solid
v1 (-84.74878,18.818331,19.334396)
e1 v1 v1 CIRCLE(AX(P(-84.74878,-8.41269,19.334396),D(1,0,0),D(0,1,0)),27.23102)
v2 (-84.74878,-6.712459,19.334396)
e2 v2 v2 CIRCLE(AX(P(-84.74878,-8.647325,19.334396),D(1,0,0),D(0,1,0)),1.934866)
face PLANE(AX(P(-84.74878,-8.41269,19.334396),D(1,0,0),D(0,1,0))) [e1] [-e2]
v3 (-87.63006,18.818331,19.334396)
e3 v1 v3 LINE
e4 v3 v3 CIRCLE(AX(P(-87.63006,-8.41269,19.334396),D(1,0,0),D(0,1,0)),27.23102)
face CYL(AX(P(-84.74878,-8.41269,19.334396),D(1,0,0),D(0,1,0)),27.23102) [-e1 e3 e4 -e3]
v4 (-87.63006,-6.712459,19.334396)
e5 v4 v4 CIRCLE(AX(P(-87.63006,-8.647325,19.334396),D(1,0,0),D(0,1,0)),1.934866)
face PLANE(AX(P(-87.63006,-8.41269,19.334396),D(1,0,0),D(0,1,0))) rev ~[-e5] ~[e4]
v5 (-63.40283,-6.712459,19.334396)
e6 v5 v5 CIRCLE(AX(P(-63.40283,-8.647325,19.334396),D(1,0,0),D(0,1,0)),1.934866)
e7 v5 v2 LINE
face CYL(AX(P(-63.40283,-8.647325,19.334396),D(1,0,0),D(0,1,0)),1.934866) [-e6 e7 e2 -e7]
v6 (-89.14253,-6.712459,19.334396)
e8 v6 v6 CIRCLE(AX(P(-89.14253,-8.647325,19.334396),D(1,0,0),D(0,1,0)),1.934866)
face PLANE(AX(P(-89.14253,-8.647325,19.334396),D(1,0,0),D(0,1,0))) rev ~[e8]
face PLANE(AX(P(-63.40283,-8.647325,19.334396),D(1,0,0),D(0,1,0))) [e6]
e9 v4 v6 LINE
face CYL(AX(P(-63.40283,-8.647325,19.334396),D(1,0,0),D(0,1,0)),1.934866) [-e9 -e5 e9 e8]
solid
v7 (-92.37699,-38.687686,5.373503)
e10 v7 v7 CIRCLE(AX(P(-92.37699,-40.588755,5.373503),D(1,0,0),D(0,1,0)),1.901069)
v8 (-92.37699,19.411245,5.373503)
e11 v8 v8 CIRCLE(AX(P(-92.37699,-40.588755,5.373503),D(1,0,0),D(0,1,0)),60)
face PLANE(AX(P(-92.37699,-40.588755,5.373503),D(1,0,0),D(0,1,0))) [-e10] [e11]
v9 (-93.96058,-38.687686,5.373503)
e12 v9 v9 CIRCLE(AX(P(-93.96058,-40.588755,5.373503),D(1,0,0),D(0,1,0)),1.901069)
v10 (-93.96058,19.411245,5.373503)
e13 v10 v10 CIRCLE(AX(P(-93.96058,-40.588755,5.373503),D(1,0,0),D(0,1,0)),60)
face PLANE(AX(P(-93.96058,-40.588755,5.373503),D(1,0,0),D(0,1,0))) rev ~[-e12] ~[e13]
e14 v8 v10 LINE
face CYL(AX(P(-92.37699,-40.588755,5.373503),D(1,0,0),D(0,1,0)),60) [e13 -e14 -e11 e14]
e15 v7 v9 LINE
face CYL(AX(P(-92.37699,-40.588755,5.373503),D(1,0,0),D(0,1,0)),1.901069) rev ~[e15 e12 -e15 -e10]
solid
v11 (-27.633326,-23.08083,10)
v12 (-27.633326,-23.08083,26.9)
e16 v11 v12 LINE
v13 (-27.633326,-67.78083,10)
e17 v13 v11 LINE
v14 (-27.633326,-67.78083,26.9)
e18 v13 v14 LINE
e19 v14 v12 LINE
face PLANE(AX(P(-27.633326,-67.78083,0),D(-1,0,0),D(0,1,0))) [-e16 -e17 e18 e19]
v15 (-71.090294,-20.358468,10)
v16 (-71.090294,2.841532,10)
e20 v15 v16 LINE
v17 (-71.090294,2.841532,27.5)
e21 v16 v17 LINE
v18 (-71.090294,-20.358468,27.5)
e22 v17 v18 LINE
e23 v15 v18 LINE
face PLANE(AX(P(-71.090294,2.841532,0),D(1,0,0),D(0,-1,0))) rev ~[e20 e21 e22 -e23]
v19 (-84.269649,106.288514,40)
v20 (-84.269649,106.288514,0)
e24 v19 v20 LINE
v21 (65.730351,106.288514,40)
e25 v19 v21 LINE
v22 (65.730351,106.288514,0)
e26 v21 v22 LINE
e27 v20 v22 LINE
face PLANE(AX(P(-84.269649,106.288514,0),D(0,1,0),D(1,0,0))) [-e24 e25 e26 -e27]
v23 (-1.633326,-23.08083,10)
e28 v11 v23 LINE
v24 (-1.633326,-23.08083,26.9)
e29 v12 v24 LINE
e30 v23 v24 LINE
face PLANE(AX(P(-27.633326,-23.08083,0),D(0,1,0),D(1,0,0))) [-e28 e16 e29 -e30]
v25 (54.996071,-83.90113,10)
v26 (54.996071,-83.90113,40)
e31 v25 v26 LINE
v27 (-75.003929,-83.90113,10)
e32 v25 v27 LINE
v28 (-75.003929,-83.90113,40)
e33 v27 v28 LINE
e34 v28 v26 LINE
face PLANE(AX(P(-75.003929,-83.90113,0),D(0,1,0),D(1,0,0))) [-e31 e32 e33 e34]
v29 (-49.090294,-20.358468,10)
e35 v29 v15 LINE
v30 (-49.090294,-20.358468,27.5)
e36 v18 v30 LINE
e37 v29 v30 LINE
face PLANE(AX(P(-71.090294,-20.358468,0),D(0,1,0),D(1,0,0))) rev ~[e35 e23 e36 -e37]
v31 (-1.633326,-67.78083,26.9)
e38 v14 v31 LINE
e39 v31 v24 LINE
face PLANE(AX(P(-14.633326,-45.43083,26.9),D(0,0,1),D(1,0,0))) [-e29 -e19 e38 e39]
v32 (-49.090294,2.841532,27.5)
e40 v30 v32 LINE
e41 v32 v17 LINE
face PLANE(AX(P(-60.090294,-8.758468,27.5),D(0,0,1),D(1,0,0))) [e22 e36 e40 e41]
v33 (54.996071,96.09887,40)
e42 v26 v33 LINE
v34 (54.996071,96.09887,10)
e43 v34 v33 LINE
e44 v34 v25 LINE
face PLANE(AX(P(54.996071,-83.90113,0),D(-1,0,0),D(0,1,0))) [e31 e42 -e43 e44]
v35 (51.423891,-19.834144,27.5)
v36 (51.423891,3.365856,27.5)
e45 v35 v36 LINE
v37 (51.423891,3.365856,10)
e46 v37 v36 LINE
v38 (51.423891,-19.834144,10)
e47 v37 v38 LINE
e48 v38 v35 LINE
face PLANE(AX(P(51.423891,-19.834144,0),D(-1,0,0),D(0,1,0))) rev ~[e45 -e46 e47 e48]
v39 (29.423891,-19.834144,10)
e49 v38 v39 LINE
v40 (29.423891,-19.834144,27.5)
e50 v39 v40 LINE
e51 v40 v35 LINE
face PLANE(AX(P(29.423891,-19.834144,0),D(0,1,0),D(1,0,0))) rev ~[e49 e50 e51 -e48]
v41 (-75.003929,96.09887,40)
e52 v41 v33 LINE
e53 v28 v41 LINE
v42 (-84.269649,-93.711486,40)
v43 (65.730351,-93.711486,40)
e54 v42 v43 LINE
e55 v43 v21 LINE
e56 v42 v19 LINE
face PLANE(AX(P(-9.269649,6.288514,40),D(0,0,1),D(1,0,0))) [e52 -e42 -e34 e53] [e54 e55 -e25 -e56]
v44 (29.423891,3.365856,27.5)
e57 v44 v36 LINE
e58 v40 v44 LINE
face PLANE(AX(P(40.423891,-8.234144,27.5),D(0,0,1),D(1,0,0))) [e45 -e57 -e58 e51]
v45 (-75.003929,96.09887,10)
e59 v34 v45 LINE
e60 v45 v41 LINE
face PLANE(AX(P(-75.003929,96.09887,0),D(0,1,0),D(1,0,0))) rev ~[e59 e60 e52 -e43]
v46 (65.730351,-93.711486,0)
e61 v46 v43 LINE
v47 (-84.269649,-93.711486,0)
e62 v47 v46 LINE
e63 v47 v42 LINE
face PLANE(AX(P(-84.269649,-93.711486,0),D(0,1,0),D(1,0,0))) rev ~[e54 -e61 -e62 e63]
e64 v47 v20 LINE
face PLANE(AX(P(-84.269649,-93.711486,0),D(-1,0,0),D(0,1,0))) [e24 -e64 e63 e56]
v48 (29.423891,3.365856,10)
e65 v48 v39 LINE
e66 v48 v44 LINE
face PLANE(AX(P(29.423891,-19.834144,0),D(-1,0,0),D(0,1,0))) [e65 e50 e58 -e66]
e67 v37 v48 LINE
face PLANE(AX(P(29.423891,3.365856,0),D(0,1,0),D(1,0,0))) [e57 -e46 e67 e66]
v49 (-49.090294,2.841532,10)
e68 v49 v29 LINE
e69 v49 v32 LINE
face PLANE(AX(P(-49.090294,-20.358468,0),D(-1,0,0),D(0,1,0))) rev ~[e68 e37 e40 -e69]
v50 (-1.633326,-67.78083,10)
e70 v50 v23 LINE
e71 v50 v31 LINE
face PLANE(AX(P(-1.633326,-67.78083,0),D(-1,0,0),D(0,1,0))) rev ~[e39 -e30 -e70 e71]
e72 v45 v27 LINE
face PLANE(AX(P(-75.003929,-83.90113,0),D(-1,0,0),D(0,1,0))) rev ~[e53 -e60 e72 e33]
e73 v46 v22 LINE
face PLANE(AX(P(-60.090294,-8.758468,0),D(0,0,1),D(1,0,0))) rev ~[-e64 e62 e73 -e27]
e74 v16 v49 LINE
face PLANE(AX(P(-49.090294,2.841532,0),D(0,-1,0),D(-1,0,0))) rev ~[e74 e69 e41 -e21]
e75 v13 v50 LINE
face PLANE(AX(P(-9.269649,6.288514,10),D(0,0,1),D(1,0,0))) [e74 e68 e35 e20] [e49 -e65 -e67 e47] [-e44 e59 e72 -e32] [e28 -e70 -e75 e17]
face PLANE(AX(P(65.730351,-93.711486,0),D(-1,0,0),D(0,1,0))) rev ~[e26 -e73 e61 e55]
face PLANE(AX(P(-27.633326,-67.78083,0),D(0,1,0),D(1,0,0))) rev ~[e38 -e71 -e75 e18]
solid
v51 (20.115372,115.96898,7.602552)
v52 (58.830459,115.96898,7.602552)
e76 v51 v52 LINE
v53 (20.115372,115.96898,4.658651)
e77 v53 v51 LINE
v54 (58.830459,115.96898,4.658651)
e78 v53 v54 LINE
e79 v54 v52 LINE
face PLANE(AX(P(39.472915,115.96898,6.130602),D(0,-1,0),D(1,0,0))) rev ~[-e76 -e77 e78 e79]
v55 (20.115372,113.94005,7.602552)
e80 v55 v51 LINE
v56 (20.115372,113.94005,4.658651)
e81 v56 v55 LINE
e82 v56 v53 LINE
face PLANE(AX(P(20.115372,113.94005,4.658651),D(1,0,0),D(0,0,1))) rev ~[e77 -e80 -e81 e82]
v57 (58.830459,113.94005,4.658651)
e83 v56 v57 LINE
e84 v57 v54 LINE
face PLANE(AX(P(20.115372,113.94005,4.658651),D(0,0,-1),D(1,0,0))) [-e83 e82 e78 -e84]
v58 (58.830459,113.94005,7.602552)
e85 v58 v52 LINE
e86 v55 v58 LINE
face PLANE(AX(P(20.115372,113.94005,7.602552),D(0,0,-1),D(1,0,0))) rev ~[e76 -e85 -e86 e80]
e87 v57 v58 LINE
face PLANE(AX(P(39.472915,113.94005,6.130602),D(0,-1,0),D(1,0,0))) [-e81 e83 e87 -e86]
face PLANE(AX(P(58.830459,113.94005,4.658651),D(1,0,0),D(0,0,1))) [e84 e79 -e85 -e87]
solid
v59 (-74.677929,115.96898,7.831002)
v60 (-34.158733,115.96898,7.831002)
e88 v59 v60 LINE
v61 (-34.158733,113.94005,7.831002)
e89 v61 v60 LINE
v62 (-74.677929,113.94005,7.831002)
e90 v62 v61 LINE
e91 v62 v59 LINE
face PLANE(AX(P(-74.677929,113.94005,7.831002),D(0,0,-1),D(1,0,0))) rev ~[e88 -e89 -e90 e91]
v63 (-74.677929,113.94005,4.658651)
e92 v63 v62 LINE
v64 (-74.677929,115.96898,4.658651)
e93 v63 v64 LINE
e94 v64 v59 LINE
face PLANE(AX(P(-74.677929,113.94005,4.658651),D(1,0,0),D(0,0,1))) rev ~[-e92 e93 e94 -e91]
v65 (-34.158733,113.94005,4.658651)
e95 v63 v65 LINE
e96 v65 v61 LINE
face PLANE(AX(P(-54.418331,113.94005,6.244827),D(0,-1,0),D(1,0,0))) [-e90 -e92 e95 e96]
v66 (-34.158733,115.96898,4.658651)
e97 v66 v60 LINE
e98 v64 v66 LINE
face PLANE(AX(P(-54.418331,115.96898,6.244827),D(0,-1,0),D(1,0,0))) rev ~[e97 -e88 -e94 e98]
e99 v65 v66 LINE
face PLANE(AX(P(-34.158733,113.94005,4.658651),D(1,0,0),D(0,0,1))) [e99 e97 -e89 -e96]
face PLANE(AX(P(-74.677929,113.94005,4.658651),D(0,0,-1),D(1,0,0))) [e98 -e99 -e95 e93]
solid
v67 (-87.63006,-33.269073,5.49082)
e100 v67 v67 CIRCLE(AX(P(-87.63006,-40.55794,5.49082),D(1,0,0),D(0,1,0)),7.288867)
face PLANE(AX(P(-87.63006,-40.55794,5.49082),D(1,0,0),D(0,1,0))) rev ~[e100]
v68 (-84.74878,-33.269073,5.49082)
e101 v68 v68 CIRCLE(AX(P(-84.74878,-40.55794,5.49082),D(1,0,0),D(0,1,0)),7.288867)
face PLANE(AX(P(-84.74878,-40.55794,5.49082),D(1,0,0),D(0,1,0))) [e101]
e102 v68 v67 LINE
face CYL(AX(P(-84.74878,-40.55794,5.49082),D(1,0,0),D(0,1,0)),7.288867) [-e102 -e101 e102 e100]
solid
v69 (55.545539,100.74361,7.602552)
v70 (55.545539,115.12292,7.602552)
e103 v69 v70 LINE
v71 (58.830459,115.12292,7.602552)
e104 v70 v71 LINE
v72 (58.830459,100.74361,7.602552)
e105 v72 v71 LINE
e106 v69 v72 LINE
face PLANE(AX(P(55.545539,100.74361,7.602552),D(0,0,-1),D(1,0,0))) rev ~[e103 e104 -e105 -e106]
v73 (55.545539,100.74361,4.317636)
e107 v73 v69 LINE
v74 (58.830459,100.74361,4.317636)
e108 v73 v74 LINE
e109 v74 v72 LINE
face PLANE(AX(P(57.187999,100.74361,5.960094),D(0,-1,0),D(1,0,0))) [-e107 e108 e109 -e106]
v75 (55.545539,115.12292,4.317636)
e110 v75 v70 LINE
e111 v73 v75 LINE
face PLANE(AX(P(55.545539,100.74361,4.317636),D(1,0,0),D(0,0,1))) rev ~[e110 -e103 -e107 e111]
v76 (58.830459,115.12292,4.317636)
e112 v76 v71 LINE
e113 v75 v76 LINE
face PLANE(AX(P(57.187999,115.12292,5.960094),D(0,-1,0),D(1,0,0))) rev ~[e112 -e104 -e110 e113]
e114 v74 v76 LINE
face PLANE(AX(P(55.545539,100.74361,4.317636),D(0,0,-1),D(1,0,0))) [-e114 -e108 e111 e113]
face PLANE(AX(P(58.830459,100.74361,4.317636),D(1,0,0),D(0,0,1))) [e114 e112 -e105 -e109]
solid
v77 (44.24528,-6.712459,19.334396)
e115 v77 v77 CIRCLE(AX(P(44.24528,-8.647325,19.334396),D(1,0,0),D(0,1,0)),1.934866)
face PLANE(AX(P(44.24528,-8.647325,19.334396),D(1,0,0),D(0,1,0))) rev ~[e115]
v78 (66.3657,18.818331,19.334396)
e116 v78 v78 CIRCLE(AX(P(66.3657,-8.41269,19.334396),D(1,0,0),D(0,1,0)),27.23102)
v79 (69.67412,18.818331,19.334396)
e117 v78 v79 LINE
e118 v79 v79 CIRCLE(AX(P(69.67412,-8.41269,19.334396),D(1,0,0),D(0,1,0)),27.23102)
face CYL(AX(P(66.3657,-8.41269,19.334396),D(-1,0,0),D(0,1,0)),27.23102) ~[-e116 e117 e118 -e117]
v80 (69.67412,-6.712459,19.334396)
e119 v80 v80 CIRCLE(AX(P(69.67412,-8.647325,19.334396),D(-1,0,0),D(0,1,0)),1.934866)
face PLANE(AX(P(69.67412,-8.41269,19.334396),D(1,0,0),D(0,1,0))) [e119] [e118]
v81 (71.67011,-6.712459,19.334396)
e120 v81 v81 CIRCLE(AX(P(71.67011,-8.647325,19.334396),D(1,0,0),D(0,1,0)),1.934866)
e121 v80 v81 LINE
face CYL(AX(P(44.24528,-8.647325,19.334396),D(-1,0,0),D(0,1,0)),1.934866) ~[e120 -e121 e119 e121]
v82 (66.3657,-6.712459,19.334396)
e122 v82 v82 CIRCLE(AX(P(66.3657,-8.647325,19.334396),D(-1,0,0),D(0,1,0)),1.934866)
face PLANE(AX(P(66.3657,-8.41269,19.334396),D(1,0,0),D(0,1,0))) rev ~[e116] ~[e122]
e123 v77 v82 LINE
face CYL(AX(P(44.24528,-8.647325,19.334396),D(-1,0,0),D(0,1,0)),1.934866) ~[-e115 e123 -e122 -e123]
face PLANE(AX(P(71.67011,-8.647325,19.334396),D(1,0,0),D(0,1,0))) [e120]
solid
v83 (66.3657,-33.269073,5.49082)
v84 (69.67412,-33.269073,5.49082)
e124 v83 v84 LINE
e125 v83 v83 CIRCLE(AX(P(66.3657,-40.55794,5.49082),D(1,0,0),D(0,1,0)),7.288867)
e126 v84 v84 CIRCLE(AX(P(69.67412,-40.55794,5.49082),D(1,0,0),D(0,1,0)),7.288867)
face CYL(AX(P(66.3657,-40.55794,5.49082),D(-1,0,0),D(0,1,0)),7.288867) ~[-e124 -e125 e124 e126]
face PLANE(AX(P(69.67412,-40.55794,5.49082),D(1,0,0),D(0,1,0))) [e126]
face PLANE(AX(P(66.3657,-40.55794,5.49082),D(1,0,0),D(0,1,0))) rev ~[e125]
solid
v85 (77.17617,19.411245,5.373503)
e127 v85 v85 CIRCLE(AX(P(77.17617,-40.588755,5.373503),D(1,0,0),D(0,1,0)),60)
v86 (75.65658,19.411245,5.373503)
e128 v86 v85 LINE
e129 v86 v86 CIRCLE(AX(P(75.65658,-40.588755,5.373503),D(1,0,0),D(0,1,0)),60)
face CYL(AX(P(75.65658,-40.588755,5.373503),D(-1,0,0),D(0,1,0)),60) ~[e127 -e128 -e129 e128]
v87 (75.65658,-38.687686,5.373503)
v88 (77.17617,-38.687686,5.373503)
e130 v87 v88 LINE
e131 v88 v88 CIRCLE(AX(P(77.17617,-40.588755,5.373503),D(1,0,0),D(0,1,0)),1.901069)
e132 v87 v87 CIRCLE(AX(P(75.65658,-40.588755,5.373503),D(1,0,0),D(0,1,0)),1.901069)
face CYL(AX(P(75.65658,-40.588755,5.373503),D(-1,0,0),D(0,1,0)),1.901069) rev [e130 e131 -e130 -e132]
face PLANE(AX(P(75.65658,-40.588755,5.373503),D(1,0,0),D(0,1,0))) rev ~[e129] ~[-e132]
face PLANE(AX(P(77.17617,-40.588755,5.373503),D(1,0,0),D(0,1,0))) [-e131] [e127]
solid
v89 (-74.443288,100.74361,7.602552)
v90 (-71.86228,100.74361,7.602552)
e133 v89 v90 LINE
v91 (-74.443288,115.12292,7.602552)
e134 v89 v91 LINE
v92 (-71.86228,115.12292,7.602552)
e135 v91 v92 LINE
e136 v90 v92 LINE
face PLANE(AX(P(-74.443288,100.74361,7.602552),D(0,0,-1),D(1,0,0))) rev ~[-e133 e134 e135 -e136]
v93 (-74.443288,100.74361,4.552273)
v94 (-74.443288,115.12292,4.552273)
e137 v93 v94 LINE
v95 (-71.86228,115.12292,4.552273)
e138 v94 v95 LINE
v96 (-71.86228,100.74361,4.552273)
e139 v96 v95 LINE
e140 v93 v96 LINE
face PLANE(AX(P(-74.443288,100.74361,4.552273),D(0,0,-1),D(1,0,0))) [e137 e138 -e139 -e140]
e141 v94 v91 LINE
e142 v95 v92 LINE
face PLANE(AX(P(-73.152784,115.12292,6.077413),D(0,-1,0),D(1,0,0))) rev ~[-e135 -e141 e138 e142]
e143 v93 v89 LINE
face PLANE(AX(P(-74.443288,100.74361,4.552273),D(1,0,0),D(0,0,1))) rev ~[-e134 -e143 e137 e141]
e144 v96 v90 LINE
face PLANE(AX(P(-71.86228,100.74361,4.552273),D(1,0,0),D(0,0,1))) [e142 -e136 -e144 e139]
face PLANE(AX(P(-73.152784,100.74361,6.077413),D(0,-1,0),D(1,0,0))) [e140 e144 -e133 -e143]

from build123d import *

# Parameters (mm, degrees)
F0_W      = 150
F0_H      = 200
F0_W_2    = 130
F0_H_2    = 180
F0_W_3    = 26
F0_H_3    = 44.7
F1_DEPTH  = 10
F3_START  = 75.65658
F2_R      = 60
F2_R_2    = 1.9010687787
F3_DEPTH  = 1.51959
F7_START  = 44.24528
F6_R      = 1.9348660317
F7_DEPTH  = 27.42483
F8_START  = -63.40283
F8_DEPTH  = 25.7397
F10_W     = 22
F10_H     = 23.2
F11_DEPTH = 27.5
F12_DEPTH = 40
F13_START = -92.37699
F13_DEPTH = 1.58359
F14_DEPTH = 26.9
F15_START = 66.3657
F9_R      = 27.2310204956
F15_DEPTH = 3.30842
F9_R_2    = 7.2888669106
F16_START = -84.74878
F16_DEPTH = 2.88128
F18_START = -113.94005
F17_W     = 38.7150868773
F17_H     = 2.9439013451
F18_DEPTH = 2.02893
F17_W_2   = 40.5191965401
F17_H_2   = 3.1723510474
F20_START = -100.74361
F19_W     = 3.284920007
F19_H     = 3.2849162817
F20_DEPTH = 14.37931
F19_W_2   = 2.5810077786
F19_H_2   = 3.0502793379


# Not quite as in the source:
# - the program builds the solid bodies; features that only make, move or delete a surface that nothing else refers to are left out


with BuildPart() as f1:
    # F0 (on Top) → F1 (new body)
    with BuildSketch(Plane.XY):
        with Locations((-9.2696487904, 6.2885135242)):
            Rectangle(F0_W, F0_H)
        with Locations((-10.0039294362, 6.098870337)):
            Rectangle(F0_W_2, F0_H_2, mode=Mode.SUBTRACT)
        with Locations((-10.0039294362, 6.098870337)):
            Rectangle(F0_W_2, F0_H_2)
        with Locations((-14.6333261281, -45.4308299661)):
            Rectangle(F0_W_3, F0_H_3, mode=Mode.SUBTRACT)
    extrude(amount=F1_DEPTH)

    # F10 (on Top) → F11 (join)
    with BuildSketch(Plane.XY):
        Polygon((-71.0902935837, -9.8448516801), (-71.0902935837, -20.3584678368), (-49.0902935837, -20.3584678368), (-49.0902935837, 2.8415321632), (-71.0902935837, 2.8415321632), (-71.0902935837, -7.195668295), align=None)
        with Locations((40.4238908535, -8.2341439949)):
            Rectangle(F10_W, F10_H)
    extrude(amount=F11_DEPTH)

    # F0 (on Top) → F12 (join)
    with BuildSketch(Plane.XY):
        with Locations((-9.2696487904, 6.2885135242)):
            Rectangle(F0_W, F0_H)
        with Locations((-10.0039294362, 6.098870337)):
            Rectangle(F0_W_2, F0_H_2, mode=Mode.SUBTRACT)
    extrude(amount=F12_DEPTH)

    # F0 (on Top) → F14 (join)
    with BuildSketch(Plane.XY):
        with Locations((-14.6333261281, -45.4308299661)):
            Rectangle(F0_W_3, F0_H_3)
    extrude(amount=F14_DEPTH)


with BuildPart() as f3:
    # F2 (on Right) → F3 (new body)
    with BuildSketch(Plane.YZ.offset(F3_START)):
        with Locations((-40.5887551606, 5.3735026158)):
            Circle(F2_R)
        with Locations((-40.5887551606, 5.3735026158)):
            Circle(F2_R_2, mode=Mode.SUBTRACT)
    extrude(amount=F3_DEPTH)


with BuildPart() as f7:
    # F6 (on Right) → F7 (new body)
    with BuildSketch(Plane.YZ.offset(F7_START)):
        with Locations((-8.6473254487, 19.3343963474)):
            Circle(F6_R)
    extrude(amount=F7_DEPTH)

    # F9 (on Right) → F15 (join)
    with BuildSketch(Plane.YZ.offset(F15_START)):
        with Locations((-8.4126899019, 19.3343963474)):
            Circle(F9_R)
    extrude(amount=F15_DEPTH)


with BuildPart() as f8:
    # F6 (on Right) → F8 (new body)
    with BuildSketch(Plane.YZ.offset(F8_START)):
        with Locations((-8.6473254487, 19.3343963474)):
            Circle(F6_R)
    extrude(amount=-F8_DEPTH)

    # F9 (on Right) → F16 (join)
    with BuildSketch(Plane.YZ.offset(F16_START)):
        with Locations((-8.4126899019, 19.3343963474)):
            Circle(F9_R)
    extrude(amount=-F16_DEPTH)


with BuildPart() as f13:
    # F2 (on Right) → F13 (new body)
    with BuildSketch(Plane.YZ.offset(F13_START)):
        with Locations((-40.5887551606, 5.3735026158)):
            Circle(F2_R)
        with Locations((-40.5887551606, 5.3735026158)):
            Circle(F2_R_2, mode=Mode.SUBTRACT)
    extrude(amount=-F13_DEPTH)


with BuildPart() as f15:
    # F9 (on Right) → F15, piece 2 (new body)
    with BuildSketch(Plane.YZ.offset(F15_START)):
        with Locations((-40.5579395592, 5.4908203892)):
            Circle(F9_R_2)
    extrude(amount=F15_DEPTH)


with BuildPart() as f16:
    # F9 (on Right) → F16, piece 2 (new body)
    with BuildSketch(Plane.YZ.offset(F16_START)):
        with Locations((-40.5579395592, 5.4908203892)):
            Circle(F9_R_2)
    extrude(amount=-F16_DEPTH)


with BuildPart() as f18:
    # F17 (on Front) → F18 (new body)
    with BuildSketch(Plane.XZ.offset(F18_START)):
        with Locations((39.4729152322, 6.1306017451)):
            Rectangle(F17_W, F17_H)
    extrude(amount=-F18_DEPTH)


with BuildPart() as f18b:
    # F17 (on Front) → F18, piece 2 (new body)
    with BuildSketch(Plane.XZ.offset(F18_START)):
        with Locations((-54.4183310121, 6.2448265962)):
            Rectangle(F17_W_2, F17_H_2)
    extrude(amount=-F18_DEPTH)


with BuildPart() as f20:
    # F19 (on Front) → F20 (new body)
    with BuildSketch(Plane.XZ.offset(F20_START)):
        with Locations((57.1879986674, 5.9600942768)):
            Rectangle(F19_W, F19_H)
    extrude(amount=-F20_DEPTH)


with BuildPart() as f20b:
    # F19 (on Front) → F20, piece 2 (new body)
    with BuildSketch(Plane.XZ.offset(F20_START)):
        with Locations((-73.1527842581, 6.0774127487)):
            Rectangle(F19_W_2, F19_H_2)
    extrude(amount=-F20_DEPTH)


solid = Compound([f1.part, f3.part, f7.part, f8.part, f13.part, f15.part, f16.part, f18.part, f18b.part, f20.part, f20b.part])
